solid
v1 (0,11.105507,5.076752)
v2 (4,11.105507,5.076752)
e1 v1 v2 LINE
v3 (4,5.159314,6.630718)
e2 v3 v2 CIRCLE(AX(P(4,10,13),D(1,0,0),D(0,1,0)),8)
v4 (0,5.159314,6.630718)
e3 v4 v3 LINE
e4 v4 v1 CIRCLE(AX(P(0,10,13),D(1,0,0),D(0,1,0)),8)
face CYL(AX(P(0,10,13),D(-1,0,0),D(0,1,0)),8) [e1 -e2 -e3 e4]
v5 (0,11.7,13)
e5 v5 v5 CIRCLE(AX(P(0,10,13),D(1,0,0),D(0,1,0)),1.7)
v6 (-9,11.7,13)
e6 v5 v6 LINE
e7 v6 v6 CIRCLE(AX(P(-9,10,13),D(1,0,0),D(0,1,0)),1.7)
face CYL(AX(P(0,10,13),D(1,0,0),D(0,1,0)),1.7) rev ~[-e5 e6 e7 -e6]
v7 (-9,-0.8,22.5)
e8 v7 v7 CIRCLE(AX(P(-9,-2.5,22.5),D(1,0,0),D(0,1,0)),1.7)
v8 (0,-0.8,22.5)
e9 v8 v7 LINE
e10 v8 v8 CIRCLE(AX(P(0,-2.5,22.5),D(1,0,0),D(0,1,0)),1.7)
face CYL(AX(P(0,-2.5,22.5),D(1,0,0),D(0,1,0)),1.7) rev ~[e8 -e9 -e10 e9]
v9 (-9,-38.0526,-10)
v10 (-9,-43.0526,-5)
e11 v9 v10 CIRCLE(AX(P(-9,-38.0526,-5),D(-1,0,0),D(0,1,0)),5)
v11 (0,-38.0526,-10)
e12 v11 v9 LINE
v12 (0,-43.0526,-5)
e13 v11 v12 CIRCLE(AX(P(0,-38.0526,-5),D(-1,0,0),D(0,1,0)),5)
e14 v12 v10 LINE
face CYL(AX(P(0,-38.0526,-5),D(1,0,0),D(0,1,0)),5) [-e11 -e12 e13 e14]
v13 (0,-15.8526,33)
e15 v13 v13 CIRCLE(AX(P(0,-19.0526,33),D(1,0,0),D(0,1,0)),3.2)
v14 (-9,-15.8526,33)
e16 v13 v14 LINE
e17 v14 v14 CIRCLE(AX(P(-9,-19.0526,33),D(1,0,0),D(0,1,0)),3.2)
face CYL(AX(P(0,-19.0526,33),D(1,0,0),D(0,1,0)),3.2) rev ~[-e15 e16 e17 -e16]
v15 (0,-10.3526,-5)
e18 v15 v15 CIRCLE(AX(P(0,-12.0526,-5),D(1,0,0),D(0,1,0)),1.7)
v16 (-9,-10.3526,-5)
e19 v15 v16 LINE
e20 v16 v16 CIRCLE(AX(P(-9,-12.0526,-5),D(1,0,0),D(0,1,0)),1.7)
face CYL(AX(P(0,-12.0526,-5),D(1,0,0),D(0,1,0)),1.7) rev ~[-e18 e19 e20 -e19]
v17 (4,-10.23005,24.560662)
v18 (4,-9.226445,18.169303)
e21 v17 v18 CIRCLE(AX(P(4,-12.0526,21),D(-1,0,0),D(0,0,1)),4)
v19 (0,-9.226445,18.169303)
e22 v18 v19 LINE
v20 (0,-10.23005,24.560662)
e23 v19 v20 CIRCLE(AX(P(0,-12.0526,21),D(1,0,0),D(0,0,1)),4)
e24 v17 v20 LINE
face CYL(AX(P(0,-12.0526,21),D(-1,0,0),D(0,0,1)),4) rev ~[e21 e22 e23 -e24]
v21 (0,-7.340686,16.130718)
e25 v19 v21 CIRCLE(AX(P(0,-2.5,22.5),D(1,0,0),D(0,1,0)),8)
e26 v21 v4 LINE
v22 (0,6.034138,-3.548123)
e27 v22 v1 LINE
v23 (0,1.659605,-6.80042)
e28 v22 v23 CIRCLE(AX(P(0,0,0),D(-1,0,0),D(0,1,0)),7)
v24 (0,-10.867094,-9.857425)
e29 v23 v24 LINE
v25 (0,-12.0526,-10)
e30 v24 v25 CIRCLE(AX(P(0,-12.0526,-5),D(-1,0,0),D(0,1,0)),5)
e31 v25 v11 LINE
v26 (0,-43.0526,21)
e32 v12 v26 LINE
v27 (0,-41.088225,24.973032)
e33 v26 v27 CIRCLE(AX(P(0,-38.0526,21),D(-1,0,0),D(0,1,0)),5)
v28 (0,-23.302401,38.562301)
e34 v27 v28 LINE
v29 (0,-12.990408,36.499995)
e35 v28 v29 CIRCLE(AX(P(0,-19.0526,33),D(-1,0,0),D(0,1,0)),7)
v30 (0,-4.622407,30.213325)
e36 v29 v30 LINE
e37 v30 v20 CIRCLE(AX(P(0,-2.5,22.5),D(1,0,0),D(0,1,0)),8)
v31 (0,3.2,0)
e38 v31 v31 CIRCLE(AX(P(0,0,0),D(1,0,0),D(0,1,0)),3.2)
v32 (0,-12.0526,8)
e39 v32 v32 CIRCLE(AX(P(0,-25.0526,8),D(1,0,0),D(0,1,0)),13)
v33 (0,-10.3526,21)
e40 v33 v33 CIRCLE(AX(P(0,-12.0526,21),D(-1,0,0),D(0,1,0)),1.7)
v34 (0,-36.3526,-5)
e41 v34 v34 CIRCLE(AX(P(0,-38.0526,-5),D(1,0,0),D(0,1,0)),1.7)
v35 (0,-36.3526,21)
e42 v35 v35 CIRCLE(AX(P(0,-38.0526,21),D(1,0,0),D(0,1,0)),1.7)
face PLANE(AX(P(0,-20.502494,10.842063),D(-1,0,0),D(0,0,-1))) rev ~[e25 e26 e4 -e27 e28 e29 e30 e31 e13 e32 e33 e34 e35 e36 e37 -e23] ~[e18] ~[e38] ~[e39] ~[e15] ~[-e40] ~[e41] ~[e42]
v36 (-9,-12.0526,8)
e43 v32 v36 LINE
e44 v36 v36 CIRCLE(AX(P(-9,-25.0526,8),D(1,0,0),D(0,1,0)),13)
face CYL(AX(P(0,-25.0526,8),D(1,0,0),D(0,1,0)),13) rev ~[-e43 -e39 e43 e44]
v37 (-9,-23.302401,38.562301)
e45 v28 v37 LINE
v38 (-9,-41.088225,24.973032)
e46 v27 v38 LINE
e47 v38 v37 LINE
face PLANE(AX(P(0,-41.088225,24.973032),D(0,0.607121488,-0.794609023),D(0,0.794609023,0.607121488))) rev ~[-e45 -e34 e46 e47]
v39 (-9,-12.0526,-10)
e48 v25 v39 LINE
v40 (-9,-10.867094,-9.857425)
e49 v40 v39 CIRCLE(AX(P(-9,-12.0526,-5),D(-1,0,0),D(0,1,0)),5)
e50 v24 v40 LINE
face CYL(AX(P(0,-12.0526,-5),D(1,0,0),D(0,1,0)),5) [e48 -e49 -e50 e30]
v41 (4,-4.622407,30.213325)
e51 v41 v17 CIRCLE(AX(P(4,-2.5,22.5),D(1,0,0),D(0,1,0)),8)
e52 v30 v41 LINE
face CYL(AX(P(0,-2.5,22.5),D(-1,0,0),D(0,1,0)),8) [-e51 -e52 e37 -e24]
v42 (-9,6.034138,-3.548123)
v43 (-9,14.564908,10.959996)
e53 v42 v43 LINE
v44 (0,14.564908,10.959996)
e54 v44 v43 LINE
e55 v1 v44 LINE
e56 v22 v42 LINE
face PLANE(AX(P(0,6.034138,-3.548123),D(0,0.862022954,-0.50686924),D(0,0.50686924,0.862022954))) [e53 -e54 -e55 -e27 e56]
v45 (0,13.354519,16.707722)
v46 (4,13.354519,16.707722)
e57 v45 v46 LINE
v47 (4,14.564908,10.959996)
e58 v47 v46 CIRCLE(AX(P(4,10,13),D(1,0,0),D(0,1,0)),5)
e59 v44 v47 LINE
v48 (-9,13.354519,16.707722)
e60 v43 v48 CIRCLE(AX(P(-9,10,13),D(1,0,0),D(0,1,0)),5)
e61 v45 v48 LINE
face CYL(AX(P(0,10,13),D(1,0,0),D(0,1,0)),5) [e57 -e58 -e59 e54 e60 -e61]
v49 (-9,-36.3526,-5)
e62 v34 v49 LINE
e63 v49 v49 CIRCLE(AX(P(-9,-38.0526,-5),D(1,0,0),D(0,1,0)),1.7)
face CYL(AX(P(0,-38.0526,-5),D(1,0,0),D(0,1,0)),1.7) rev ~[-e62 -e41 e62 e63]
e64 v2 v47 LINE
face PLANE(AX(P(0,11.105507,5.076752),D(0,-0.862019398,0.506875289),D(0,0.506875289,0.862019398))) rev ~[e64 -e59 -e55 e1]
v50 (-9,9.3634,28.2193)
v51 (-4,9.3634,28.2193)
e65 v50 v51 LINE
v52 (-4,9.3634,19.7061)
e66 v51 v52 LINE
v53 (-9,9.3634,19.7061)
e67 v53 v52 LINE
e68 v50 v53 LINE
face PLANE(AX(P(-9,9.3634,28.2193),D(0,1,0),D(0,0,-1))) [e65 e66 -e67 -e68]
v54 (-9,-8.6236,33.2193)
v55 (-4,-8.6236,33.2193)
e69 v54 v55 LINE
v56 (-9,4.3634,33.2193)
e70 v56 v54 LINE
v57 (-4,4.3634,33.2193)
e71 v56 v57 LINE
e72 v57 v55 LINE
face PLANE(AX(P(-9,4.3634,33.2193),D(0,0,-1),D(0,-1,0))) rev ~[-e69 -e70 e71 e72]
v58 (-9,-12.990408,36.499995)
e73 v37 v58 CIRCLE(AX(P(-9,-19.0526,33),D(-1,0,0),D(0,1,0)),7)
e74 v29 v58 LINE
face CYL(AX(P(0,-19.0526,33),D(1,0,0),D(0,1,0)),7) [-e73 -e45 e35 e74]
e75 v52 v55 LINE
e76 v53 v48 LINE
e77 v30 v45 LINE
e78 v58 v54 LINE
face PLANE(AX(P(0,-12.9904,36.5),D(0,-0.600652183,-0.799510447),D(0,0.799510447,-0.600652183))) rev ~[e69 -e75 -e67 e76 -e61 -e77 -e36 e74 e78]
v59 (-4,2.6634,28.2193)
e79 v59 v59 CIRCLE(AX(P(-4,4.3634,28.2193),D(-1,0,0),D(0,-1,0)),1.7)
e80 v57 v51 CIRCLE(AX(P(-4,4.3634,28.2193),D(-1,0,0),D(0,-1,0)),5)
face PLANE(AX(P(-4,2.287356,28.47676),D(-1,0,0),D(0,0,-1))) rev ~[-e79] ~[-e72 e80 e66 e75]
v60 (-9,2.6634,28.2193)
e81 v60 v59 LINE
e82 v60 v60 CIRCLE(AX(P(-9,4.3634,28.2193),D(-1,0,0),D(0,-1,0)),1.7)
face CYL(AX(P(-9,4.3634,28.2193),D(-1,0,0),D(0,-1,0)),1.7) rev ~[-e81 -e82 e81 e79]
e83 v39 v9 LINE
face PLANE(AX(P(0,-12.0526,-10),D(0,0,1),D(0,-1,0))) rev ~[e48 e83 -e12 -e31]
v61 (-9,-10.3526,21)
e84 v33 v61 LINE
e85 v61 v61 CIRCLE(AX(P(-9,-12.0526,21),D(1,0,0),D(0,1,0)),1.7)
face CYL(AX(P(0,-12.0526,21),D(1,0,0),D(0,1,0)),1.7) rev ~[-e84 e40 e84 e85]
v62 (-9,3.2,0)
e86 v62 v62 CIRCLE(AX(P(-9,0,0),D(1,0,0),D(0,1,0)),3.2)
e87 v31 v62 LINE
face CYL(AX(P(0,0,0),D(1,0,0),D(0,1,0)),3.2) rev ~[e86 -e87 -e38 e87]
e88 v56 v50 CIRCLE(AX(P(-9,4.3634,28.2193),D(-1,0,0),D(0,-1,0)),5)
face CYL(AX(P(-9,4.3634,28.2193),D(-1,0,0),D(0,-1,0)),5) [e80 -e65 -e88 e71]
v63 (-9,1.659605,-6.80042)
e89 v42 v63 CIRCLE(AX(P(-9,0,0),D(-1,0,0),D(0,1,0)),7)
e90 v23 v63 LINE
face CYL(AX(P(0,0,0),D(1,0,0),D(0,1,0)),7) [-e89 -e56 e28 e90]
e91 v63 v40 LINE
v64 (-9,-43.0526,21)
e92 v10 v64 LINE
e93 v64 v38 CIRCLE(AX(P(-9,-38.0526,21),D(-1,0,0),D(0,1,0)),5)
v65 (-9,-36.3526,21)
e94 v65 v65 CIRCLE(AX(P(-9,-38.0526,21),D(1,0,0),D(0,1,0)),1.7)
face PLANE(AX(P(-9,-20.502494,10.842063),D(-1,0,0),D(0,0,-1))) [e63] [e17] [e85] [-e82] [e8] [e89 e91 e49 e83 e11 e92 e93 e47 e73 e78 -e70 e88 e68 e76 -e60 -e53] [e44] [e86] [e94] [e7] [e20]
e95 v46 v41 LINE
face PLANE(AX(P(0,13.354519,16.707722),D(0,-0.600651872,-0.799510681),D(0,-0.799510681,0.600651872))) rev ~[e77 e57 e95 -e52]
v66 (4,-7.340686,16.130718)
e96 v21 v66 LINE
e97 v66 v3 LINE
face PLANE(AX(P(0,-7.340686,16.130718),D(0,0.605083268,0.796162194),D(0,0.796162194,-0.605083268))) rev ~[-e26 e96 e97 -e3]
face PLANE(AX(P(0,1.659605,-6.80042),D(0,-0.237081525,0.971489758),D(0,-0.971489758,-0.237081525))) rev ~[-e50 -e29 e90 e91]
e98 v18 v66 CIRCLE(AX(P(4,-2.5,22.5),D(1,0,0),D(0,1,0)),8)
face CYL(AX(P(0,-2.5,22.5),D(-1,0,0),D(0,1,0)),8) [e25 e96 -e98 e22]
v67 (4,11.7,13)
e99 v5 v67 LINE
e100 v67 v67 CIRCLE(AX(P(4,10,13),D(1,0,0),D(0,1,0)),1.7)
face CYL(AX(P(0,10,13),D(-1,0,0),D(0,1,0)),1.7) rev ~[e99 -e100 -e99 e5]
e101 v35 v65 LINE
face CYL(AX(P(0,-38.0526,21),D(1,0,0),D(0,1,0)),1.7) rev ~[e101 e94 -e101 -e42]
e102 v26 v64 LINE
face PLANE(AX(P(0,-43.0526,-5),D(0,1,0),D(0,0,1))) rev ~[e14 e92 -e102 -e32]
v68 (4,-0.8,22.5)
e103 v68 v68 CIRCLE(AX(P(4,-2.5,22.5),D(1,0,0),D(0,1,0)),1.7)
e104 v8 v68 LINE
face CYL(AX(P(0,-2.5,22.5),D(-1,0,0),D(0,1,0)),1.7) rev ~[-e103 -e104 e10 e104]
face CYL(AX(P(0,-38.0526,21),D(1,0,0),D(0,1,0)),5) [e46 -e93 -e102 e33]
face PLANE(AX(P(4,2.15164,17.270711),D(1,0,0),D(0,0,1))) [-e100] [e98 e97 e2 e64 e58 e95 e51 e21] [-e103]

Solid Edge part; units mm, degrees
sketch "Sketch1" plane through (0, 0, 0) normal (1, 0, 0) x (0, 1, 0)
  line L0 (-41.0882, 24.973) -> (-23.3024, 38.5623)
  line L1 (-12.9904, 36.5) -> (6.0622, 3.5)
  line L2 (1.6596, -6.8004) -> (-10.8671, -9.8574)
  line L3 (-12.0526, -10) -> (-38.0526, -10)
  line L4 (-43.0526, -5) -> (-43.0526, 21)
  arc A0 (-23.3024, 38.5623) -> (-12.9904, 36.5) centre (-19.0526, 33) cw
  arc A1 (6.0622, 3.5) -> (1.6596, -6.8004) centre (0, 0) cw
  arc A2 (-10.8671, -9.8574) -> (-12.0526, -10) centre (-12.0526, -5) cw
  arc A3 (-38.0526, -10) -> (-43.0526, -5) centre (-38.0526, -5) cw
  arc A4 (-43.0526, 21) -> (-41.0882, 24.973) centre (-38.0526, 21) cw
  circle A5 centre (-19.0526, 33) radius 3.2
  circle A6 centre (0, 0) radius 3.2
  circle A7 centre (-12.0526, -5) radius 1.7
  circle A8 centre (-12.0526, 21) radius 1.7
  circle A9 centre (-38.0526, 21) radius 1.7
  circle A10 centre (-38.0526, -5) radius 1.7
  circle A11 centre (-25.0526, 8) radius 13
extrude "Protrusion1" add sketch "Sketch1" against normal blind 9
sketch "Sketch2" plane through (0, -18.0263, 15) normal (1, 0, 0) x (0, 1, 0)
  circle A0 centre (15.5263, 7.5) radius 1.7
  arc A1 (24.0885, -11.5) -> (24.0604, -18.5481) centre (18.0263, -15) cw
  line L0 (24.0604, -18.5481) -> (32.5912, -4.04)
  line L1 (5.0359, 21.5) -> (31.3808, 1.7077)
  line L2 (5.0359, 21.5) -> (24.0885, -11.5)
  arc A2 (32.5912, -4.04) -> (31.3808, 1.7077) centre (28.0263, -2) ccw
  circle A3 centre (28.0263, -2) radius 1.7
extrude "ExtrudedProtrusion_2" add sketch "Sketch2" against normal blind 9
sketch "Sketch3" plane through (0, -14.0263, 15) normal (1, 0, 0) x (0, 1, 0)
  line L0 (6.6856, 1.1307) -> (19.1856, -8.3693)
  line L1 (25.1318, -9.9232) -> (28.5912, -4.04)
  arc A0 (28.5912, -4.04) -> (27.3808, 1.7077) centre (24.0263, -2) ccw
  line L2 (27.3808, 1.7077) -> (9.4039, 15.2133)
  arc A1 (9.4039, 15.2133) -> (6.6856, 1.1307) centre (11.5263, 7.5) ccw
  arc A2 (19.1856, -8.3693) -> (25.1318, -9.9232) centre (24.0263, -2) ccw
  circle A3 centre (11.5263, 7.5) radius 1.7
  circle A4 centre (24.0263, -2) radius 1.7
extrude "ExtrudedProtrusion_4" add sketch "Sketch3" along normal blind 4
sketch "Sketch4" plane through (0, -15.9735, 15) normal (1, 0, 0) x (0, 0, 1)
  circle A0 centre (6, -3.9209) radius 4
extrude "Cutout1" cut sketch "Sketch4" along normal through all
sketch "Sketch5" plane through (-9, -14.0263, 15) normal (-1, 0, 0) x (0, -1, 0)
  line L0 (-23.3897, 4.7061) -> (-5.4027, 18.2193)
  line L1 (-18.3897, 18.2193) -> (-5.4027, 18.2193)
  line L2 (-23.3897, 13.2193) -> (-23.3897, 4.7061)
  arc A0 (-18.3897, 18.2193) -> (-23.3897, 13.2193) centre (-18.3897, 13.2193) ccw
  circle A1 centre (-18.3897, 13.2193) radius 1.7
extrude "ExtrudedProtrusion_5" add sketch "Sketch5" against normal blind 5
properties material "ABS Plastic, high impact"
